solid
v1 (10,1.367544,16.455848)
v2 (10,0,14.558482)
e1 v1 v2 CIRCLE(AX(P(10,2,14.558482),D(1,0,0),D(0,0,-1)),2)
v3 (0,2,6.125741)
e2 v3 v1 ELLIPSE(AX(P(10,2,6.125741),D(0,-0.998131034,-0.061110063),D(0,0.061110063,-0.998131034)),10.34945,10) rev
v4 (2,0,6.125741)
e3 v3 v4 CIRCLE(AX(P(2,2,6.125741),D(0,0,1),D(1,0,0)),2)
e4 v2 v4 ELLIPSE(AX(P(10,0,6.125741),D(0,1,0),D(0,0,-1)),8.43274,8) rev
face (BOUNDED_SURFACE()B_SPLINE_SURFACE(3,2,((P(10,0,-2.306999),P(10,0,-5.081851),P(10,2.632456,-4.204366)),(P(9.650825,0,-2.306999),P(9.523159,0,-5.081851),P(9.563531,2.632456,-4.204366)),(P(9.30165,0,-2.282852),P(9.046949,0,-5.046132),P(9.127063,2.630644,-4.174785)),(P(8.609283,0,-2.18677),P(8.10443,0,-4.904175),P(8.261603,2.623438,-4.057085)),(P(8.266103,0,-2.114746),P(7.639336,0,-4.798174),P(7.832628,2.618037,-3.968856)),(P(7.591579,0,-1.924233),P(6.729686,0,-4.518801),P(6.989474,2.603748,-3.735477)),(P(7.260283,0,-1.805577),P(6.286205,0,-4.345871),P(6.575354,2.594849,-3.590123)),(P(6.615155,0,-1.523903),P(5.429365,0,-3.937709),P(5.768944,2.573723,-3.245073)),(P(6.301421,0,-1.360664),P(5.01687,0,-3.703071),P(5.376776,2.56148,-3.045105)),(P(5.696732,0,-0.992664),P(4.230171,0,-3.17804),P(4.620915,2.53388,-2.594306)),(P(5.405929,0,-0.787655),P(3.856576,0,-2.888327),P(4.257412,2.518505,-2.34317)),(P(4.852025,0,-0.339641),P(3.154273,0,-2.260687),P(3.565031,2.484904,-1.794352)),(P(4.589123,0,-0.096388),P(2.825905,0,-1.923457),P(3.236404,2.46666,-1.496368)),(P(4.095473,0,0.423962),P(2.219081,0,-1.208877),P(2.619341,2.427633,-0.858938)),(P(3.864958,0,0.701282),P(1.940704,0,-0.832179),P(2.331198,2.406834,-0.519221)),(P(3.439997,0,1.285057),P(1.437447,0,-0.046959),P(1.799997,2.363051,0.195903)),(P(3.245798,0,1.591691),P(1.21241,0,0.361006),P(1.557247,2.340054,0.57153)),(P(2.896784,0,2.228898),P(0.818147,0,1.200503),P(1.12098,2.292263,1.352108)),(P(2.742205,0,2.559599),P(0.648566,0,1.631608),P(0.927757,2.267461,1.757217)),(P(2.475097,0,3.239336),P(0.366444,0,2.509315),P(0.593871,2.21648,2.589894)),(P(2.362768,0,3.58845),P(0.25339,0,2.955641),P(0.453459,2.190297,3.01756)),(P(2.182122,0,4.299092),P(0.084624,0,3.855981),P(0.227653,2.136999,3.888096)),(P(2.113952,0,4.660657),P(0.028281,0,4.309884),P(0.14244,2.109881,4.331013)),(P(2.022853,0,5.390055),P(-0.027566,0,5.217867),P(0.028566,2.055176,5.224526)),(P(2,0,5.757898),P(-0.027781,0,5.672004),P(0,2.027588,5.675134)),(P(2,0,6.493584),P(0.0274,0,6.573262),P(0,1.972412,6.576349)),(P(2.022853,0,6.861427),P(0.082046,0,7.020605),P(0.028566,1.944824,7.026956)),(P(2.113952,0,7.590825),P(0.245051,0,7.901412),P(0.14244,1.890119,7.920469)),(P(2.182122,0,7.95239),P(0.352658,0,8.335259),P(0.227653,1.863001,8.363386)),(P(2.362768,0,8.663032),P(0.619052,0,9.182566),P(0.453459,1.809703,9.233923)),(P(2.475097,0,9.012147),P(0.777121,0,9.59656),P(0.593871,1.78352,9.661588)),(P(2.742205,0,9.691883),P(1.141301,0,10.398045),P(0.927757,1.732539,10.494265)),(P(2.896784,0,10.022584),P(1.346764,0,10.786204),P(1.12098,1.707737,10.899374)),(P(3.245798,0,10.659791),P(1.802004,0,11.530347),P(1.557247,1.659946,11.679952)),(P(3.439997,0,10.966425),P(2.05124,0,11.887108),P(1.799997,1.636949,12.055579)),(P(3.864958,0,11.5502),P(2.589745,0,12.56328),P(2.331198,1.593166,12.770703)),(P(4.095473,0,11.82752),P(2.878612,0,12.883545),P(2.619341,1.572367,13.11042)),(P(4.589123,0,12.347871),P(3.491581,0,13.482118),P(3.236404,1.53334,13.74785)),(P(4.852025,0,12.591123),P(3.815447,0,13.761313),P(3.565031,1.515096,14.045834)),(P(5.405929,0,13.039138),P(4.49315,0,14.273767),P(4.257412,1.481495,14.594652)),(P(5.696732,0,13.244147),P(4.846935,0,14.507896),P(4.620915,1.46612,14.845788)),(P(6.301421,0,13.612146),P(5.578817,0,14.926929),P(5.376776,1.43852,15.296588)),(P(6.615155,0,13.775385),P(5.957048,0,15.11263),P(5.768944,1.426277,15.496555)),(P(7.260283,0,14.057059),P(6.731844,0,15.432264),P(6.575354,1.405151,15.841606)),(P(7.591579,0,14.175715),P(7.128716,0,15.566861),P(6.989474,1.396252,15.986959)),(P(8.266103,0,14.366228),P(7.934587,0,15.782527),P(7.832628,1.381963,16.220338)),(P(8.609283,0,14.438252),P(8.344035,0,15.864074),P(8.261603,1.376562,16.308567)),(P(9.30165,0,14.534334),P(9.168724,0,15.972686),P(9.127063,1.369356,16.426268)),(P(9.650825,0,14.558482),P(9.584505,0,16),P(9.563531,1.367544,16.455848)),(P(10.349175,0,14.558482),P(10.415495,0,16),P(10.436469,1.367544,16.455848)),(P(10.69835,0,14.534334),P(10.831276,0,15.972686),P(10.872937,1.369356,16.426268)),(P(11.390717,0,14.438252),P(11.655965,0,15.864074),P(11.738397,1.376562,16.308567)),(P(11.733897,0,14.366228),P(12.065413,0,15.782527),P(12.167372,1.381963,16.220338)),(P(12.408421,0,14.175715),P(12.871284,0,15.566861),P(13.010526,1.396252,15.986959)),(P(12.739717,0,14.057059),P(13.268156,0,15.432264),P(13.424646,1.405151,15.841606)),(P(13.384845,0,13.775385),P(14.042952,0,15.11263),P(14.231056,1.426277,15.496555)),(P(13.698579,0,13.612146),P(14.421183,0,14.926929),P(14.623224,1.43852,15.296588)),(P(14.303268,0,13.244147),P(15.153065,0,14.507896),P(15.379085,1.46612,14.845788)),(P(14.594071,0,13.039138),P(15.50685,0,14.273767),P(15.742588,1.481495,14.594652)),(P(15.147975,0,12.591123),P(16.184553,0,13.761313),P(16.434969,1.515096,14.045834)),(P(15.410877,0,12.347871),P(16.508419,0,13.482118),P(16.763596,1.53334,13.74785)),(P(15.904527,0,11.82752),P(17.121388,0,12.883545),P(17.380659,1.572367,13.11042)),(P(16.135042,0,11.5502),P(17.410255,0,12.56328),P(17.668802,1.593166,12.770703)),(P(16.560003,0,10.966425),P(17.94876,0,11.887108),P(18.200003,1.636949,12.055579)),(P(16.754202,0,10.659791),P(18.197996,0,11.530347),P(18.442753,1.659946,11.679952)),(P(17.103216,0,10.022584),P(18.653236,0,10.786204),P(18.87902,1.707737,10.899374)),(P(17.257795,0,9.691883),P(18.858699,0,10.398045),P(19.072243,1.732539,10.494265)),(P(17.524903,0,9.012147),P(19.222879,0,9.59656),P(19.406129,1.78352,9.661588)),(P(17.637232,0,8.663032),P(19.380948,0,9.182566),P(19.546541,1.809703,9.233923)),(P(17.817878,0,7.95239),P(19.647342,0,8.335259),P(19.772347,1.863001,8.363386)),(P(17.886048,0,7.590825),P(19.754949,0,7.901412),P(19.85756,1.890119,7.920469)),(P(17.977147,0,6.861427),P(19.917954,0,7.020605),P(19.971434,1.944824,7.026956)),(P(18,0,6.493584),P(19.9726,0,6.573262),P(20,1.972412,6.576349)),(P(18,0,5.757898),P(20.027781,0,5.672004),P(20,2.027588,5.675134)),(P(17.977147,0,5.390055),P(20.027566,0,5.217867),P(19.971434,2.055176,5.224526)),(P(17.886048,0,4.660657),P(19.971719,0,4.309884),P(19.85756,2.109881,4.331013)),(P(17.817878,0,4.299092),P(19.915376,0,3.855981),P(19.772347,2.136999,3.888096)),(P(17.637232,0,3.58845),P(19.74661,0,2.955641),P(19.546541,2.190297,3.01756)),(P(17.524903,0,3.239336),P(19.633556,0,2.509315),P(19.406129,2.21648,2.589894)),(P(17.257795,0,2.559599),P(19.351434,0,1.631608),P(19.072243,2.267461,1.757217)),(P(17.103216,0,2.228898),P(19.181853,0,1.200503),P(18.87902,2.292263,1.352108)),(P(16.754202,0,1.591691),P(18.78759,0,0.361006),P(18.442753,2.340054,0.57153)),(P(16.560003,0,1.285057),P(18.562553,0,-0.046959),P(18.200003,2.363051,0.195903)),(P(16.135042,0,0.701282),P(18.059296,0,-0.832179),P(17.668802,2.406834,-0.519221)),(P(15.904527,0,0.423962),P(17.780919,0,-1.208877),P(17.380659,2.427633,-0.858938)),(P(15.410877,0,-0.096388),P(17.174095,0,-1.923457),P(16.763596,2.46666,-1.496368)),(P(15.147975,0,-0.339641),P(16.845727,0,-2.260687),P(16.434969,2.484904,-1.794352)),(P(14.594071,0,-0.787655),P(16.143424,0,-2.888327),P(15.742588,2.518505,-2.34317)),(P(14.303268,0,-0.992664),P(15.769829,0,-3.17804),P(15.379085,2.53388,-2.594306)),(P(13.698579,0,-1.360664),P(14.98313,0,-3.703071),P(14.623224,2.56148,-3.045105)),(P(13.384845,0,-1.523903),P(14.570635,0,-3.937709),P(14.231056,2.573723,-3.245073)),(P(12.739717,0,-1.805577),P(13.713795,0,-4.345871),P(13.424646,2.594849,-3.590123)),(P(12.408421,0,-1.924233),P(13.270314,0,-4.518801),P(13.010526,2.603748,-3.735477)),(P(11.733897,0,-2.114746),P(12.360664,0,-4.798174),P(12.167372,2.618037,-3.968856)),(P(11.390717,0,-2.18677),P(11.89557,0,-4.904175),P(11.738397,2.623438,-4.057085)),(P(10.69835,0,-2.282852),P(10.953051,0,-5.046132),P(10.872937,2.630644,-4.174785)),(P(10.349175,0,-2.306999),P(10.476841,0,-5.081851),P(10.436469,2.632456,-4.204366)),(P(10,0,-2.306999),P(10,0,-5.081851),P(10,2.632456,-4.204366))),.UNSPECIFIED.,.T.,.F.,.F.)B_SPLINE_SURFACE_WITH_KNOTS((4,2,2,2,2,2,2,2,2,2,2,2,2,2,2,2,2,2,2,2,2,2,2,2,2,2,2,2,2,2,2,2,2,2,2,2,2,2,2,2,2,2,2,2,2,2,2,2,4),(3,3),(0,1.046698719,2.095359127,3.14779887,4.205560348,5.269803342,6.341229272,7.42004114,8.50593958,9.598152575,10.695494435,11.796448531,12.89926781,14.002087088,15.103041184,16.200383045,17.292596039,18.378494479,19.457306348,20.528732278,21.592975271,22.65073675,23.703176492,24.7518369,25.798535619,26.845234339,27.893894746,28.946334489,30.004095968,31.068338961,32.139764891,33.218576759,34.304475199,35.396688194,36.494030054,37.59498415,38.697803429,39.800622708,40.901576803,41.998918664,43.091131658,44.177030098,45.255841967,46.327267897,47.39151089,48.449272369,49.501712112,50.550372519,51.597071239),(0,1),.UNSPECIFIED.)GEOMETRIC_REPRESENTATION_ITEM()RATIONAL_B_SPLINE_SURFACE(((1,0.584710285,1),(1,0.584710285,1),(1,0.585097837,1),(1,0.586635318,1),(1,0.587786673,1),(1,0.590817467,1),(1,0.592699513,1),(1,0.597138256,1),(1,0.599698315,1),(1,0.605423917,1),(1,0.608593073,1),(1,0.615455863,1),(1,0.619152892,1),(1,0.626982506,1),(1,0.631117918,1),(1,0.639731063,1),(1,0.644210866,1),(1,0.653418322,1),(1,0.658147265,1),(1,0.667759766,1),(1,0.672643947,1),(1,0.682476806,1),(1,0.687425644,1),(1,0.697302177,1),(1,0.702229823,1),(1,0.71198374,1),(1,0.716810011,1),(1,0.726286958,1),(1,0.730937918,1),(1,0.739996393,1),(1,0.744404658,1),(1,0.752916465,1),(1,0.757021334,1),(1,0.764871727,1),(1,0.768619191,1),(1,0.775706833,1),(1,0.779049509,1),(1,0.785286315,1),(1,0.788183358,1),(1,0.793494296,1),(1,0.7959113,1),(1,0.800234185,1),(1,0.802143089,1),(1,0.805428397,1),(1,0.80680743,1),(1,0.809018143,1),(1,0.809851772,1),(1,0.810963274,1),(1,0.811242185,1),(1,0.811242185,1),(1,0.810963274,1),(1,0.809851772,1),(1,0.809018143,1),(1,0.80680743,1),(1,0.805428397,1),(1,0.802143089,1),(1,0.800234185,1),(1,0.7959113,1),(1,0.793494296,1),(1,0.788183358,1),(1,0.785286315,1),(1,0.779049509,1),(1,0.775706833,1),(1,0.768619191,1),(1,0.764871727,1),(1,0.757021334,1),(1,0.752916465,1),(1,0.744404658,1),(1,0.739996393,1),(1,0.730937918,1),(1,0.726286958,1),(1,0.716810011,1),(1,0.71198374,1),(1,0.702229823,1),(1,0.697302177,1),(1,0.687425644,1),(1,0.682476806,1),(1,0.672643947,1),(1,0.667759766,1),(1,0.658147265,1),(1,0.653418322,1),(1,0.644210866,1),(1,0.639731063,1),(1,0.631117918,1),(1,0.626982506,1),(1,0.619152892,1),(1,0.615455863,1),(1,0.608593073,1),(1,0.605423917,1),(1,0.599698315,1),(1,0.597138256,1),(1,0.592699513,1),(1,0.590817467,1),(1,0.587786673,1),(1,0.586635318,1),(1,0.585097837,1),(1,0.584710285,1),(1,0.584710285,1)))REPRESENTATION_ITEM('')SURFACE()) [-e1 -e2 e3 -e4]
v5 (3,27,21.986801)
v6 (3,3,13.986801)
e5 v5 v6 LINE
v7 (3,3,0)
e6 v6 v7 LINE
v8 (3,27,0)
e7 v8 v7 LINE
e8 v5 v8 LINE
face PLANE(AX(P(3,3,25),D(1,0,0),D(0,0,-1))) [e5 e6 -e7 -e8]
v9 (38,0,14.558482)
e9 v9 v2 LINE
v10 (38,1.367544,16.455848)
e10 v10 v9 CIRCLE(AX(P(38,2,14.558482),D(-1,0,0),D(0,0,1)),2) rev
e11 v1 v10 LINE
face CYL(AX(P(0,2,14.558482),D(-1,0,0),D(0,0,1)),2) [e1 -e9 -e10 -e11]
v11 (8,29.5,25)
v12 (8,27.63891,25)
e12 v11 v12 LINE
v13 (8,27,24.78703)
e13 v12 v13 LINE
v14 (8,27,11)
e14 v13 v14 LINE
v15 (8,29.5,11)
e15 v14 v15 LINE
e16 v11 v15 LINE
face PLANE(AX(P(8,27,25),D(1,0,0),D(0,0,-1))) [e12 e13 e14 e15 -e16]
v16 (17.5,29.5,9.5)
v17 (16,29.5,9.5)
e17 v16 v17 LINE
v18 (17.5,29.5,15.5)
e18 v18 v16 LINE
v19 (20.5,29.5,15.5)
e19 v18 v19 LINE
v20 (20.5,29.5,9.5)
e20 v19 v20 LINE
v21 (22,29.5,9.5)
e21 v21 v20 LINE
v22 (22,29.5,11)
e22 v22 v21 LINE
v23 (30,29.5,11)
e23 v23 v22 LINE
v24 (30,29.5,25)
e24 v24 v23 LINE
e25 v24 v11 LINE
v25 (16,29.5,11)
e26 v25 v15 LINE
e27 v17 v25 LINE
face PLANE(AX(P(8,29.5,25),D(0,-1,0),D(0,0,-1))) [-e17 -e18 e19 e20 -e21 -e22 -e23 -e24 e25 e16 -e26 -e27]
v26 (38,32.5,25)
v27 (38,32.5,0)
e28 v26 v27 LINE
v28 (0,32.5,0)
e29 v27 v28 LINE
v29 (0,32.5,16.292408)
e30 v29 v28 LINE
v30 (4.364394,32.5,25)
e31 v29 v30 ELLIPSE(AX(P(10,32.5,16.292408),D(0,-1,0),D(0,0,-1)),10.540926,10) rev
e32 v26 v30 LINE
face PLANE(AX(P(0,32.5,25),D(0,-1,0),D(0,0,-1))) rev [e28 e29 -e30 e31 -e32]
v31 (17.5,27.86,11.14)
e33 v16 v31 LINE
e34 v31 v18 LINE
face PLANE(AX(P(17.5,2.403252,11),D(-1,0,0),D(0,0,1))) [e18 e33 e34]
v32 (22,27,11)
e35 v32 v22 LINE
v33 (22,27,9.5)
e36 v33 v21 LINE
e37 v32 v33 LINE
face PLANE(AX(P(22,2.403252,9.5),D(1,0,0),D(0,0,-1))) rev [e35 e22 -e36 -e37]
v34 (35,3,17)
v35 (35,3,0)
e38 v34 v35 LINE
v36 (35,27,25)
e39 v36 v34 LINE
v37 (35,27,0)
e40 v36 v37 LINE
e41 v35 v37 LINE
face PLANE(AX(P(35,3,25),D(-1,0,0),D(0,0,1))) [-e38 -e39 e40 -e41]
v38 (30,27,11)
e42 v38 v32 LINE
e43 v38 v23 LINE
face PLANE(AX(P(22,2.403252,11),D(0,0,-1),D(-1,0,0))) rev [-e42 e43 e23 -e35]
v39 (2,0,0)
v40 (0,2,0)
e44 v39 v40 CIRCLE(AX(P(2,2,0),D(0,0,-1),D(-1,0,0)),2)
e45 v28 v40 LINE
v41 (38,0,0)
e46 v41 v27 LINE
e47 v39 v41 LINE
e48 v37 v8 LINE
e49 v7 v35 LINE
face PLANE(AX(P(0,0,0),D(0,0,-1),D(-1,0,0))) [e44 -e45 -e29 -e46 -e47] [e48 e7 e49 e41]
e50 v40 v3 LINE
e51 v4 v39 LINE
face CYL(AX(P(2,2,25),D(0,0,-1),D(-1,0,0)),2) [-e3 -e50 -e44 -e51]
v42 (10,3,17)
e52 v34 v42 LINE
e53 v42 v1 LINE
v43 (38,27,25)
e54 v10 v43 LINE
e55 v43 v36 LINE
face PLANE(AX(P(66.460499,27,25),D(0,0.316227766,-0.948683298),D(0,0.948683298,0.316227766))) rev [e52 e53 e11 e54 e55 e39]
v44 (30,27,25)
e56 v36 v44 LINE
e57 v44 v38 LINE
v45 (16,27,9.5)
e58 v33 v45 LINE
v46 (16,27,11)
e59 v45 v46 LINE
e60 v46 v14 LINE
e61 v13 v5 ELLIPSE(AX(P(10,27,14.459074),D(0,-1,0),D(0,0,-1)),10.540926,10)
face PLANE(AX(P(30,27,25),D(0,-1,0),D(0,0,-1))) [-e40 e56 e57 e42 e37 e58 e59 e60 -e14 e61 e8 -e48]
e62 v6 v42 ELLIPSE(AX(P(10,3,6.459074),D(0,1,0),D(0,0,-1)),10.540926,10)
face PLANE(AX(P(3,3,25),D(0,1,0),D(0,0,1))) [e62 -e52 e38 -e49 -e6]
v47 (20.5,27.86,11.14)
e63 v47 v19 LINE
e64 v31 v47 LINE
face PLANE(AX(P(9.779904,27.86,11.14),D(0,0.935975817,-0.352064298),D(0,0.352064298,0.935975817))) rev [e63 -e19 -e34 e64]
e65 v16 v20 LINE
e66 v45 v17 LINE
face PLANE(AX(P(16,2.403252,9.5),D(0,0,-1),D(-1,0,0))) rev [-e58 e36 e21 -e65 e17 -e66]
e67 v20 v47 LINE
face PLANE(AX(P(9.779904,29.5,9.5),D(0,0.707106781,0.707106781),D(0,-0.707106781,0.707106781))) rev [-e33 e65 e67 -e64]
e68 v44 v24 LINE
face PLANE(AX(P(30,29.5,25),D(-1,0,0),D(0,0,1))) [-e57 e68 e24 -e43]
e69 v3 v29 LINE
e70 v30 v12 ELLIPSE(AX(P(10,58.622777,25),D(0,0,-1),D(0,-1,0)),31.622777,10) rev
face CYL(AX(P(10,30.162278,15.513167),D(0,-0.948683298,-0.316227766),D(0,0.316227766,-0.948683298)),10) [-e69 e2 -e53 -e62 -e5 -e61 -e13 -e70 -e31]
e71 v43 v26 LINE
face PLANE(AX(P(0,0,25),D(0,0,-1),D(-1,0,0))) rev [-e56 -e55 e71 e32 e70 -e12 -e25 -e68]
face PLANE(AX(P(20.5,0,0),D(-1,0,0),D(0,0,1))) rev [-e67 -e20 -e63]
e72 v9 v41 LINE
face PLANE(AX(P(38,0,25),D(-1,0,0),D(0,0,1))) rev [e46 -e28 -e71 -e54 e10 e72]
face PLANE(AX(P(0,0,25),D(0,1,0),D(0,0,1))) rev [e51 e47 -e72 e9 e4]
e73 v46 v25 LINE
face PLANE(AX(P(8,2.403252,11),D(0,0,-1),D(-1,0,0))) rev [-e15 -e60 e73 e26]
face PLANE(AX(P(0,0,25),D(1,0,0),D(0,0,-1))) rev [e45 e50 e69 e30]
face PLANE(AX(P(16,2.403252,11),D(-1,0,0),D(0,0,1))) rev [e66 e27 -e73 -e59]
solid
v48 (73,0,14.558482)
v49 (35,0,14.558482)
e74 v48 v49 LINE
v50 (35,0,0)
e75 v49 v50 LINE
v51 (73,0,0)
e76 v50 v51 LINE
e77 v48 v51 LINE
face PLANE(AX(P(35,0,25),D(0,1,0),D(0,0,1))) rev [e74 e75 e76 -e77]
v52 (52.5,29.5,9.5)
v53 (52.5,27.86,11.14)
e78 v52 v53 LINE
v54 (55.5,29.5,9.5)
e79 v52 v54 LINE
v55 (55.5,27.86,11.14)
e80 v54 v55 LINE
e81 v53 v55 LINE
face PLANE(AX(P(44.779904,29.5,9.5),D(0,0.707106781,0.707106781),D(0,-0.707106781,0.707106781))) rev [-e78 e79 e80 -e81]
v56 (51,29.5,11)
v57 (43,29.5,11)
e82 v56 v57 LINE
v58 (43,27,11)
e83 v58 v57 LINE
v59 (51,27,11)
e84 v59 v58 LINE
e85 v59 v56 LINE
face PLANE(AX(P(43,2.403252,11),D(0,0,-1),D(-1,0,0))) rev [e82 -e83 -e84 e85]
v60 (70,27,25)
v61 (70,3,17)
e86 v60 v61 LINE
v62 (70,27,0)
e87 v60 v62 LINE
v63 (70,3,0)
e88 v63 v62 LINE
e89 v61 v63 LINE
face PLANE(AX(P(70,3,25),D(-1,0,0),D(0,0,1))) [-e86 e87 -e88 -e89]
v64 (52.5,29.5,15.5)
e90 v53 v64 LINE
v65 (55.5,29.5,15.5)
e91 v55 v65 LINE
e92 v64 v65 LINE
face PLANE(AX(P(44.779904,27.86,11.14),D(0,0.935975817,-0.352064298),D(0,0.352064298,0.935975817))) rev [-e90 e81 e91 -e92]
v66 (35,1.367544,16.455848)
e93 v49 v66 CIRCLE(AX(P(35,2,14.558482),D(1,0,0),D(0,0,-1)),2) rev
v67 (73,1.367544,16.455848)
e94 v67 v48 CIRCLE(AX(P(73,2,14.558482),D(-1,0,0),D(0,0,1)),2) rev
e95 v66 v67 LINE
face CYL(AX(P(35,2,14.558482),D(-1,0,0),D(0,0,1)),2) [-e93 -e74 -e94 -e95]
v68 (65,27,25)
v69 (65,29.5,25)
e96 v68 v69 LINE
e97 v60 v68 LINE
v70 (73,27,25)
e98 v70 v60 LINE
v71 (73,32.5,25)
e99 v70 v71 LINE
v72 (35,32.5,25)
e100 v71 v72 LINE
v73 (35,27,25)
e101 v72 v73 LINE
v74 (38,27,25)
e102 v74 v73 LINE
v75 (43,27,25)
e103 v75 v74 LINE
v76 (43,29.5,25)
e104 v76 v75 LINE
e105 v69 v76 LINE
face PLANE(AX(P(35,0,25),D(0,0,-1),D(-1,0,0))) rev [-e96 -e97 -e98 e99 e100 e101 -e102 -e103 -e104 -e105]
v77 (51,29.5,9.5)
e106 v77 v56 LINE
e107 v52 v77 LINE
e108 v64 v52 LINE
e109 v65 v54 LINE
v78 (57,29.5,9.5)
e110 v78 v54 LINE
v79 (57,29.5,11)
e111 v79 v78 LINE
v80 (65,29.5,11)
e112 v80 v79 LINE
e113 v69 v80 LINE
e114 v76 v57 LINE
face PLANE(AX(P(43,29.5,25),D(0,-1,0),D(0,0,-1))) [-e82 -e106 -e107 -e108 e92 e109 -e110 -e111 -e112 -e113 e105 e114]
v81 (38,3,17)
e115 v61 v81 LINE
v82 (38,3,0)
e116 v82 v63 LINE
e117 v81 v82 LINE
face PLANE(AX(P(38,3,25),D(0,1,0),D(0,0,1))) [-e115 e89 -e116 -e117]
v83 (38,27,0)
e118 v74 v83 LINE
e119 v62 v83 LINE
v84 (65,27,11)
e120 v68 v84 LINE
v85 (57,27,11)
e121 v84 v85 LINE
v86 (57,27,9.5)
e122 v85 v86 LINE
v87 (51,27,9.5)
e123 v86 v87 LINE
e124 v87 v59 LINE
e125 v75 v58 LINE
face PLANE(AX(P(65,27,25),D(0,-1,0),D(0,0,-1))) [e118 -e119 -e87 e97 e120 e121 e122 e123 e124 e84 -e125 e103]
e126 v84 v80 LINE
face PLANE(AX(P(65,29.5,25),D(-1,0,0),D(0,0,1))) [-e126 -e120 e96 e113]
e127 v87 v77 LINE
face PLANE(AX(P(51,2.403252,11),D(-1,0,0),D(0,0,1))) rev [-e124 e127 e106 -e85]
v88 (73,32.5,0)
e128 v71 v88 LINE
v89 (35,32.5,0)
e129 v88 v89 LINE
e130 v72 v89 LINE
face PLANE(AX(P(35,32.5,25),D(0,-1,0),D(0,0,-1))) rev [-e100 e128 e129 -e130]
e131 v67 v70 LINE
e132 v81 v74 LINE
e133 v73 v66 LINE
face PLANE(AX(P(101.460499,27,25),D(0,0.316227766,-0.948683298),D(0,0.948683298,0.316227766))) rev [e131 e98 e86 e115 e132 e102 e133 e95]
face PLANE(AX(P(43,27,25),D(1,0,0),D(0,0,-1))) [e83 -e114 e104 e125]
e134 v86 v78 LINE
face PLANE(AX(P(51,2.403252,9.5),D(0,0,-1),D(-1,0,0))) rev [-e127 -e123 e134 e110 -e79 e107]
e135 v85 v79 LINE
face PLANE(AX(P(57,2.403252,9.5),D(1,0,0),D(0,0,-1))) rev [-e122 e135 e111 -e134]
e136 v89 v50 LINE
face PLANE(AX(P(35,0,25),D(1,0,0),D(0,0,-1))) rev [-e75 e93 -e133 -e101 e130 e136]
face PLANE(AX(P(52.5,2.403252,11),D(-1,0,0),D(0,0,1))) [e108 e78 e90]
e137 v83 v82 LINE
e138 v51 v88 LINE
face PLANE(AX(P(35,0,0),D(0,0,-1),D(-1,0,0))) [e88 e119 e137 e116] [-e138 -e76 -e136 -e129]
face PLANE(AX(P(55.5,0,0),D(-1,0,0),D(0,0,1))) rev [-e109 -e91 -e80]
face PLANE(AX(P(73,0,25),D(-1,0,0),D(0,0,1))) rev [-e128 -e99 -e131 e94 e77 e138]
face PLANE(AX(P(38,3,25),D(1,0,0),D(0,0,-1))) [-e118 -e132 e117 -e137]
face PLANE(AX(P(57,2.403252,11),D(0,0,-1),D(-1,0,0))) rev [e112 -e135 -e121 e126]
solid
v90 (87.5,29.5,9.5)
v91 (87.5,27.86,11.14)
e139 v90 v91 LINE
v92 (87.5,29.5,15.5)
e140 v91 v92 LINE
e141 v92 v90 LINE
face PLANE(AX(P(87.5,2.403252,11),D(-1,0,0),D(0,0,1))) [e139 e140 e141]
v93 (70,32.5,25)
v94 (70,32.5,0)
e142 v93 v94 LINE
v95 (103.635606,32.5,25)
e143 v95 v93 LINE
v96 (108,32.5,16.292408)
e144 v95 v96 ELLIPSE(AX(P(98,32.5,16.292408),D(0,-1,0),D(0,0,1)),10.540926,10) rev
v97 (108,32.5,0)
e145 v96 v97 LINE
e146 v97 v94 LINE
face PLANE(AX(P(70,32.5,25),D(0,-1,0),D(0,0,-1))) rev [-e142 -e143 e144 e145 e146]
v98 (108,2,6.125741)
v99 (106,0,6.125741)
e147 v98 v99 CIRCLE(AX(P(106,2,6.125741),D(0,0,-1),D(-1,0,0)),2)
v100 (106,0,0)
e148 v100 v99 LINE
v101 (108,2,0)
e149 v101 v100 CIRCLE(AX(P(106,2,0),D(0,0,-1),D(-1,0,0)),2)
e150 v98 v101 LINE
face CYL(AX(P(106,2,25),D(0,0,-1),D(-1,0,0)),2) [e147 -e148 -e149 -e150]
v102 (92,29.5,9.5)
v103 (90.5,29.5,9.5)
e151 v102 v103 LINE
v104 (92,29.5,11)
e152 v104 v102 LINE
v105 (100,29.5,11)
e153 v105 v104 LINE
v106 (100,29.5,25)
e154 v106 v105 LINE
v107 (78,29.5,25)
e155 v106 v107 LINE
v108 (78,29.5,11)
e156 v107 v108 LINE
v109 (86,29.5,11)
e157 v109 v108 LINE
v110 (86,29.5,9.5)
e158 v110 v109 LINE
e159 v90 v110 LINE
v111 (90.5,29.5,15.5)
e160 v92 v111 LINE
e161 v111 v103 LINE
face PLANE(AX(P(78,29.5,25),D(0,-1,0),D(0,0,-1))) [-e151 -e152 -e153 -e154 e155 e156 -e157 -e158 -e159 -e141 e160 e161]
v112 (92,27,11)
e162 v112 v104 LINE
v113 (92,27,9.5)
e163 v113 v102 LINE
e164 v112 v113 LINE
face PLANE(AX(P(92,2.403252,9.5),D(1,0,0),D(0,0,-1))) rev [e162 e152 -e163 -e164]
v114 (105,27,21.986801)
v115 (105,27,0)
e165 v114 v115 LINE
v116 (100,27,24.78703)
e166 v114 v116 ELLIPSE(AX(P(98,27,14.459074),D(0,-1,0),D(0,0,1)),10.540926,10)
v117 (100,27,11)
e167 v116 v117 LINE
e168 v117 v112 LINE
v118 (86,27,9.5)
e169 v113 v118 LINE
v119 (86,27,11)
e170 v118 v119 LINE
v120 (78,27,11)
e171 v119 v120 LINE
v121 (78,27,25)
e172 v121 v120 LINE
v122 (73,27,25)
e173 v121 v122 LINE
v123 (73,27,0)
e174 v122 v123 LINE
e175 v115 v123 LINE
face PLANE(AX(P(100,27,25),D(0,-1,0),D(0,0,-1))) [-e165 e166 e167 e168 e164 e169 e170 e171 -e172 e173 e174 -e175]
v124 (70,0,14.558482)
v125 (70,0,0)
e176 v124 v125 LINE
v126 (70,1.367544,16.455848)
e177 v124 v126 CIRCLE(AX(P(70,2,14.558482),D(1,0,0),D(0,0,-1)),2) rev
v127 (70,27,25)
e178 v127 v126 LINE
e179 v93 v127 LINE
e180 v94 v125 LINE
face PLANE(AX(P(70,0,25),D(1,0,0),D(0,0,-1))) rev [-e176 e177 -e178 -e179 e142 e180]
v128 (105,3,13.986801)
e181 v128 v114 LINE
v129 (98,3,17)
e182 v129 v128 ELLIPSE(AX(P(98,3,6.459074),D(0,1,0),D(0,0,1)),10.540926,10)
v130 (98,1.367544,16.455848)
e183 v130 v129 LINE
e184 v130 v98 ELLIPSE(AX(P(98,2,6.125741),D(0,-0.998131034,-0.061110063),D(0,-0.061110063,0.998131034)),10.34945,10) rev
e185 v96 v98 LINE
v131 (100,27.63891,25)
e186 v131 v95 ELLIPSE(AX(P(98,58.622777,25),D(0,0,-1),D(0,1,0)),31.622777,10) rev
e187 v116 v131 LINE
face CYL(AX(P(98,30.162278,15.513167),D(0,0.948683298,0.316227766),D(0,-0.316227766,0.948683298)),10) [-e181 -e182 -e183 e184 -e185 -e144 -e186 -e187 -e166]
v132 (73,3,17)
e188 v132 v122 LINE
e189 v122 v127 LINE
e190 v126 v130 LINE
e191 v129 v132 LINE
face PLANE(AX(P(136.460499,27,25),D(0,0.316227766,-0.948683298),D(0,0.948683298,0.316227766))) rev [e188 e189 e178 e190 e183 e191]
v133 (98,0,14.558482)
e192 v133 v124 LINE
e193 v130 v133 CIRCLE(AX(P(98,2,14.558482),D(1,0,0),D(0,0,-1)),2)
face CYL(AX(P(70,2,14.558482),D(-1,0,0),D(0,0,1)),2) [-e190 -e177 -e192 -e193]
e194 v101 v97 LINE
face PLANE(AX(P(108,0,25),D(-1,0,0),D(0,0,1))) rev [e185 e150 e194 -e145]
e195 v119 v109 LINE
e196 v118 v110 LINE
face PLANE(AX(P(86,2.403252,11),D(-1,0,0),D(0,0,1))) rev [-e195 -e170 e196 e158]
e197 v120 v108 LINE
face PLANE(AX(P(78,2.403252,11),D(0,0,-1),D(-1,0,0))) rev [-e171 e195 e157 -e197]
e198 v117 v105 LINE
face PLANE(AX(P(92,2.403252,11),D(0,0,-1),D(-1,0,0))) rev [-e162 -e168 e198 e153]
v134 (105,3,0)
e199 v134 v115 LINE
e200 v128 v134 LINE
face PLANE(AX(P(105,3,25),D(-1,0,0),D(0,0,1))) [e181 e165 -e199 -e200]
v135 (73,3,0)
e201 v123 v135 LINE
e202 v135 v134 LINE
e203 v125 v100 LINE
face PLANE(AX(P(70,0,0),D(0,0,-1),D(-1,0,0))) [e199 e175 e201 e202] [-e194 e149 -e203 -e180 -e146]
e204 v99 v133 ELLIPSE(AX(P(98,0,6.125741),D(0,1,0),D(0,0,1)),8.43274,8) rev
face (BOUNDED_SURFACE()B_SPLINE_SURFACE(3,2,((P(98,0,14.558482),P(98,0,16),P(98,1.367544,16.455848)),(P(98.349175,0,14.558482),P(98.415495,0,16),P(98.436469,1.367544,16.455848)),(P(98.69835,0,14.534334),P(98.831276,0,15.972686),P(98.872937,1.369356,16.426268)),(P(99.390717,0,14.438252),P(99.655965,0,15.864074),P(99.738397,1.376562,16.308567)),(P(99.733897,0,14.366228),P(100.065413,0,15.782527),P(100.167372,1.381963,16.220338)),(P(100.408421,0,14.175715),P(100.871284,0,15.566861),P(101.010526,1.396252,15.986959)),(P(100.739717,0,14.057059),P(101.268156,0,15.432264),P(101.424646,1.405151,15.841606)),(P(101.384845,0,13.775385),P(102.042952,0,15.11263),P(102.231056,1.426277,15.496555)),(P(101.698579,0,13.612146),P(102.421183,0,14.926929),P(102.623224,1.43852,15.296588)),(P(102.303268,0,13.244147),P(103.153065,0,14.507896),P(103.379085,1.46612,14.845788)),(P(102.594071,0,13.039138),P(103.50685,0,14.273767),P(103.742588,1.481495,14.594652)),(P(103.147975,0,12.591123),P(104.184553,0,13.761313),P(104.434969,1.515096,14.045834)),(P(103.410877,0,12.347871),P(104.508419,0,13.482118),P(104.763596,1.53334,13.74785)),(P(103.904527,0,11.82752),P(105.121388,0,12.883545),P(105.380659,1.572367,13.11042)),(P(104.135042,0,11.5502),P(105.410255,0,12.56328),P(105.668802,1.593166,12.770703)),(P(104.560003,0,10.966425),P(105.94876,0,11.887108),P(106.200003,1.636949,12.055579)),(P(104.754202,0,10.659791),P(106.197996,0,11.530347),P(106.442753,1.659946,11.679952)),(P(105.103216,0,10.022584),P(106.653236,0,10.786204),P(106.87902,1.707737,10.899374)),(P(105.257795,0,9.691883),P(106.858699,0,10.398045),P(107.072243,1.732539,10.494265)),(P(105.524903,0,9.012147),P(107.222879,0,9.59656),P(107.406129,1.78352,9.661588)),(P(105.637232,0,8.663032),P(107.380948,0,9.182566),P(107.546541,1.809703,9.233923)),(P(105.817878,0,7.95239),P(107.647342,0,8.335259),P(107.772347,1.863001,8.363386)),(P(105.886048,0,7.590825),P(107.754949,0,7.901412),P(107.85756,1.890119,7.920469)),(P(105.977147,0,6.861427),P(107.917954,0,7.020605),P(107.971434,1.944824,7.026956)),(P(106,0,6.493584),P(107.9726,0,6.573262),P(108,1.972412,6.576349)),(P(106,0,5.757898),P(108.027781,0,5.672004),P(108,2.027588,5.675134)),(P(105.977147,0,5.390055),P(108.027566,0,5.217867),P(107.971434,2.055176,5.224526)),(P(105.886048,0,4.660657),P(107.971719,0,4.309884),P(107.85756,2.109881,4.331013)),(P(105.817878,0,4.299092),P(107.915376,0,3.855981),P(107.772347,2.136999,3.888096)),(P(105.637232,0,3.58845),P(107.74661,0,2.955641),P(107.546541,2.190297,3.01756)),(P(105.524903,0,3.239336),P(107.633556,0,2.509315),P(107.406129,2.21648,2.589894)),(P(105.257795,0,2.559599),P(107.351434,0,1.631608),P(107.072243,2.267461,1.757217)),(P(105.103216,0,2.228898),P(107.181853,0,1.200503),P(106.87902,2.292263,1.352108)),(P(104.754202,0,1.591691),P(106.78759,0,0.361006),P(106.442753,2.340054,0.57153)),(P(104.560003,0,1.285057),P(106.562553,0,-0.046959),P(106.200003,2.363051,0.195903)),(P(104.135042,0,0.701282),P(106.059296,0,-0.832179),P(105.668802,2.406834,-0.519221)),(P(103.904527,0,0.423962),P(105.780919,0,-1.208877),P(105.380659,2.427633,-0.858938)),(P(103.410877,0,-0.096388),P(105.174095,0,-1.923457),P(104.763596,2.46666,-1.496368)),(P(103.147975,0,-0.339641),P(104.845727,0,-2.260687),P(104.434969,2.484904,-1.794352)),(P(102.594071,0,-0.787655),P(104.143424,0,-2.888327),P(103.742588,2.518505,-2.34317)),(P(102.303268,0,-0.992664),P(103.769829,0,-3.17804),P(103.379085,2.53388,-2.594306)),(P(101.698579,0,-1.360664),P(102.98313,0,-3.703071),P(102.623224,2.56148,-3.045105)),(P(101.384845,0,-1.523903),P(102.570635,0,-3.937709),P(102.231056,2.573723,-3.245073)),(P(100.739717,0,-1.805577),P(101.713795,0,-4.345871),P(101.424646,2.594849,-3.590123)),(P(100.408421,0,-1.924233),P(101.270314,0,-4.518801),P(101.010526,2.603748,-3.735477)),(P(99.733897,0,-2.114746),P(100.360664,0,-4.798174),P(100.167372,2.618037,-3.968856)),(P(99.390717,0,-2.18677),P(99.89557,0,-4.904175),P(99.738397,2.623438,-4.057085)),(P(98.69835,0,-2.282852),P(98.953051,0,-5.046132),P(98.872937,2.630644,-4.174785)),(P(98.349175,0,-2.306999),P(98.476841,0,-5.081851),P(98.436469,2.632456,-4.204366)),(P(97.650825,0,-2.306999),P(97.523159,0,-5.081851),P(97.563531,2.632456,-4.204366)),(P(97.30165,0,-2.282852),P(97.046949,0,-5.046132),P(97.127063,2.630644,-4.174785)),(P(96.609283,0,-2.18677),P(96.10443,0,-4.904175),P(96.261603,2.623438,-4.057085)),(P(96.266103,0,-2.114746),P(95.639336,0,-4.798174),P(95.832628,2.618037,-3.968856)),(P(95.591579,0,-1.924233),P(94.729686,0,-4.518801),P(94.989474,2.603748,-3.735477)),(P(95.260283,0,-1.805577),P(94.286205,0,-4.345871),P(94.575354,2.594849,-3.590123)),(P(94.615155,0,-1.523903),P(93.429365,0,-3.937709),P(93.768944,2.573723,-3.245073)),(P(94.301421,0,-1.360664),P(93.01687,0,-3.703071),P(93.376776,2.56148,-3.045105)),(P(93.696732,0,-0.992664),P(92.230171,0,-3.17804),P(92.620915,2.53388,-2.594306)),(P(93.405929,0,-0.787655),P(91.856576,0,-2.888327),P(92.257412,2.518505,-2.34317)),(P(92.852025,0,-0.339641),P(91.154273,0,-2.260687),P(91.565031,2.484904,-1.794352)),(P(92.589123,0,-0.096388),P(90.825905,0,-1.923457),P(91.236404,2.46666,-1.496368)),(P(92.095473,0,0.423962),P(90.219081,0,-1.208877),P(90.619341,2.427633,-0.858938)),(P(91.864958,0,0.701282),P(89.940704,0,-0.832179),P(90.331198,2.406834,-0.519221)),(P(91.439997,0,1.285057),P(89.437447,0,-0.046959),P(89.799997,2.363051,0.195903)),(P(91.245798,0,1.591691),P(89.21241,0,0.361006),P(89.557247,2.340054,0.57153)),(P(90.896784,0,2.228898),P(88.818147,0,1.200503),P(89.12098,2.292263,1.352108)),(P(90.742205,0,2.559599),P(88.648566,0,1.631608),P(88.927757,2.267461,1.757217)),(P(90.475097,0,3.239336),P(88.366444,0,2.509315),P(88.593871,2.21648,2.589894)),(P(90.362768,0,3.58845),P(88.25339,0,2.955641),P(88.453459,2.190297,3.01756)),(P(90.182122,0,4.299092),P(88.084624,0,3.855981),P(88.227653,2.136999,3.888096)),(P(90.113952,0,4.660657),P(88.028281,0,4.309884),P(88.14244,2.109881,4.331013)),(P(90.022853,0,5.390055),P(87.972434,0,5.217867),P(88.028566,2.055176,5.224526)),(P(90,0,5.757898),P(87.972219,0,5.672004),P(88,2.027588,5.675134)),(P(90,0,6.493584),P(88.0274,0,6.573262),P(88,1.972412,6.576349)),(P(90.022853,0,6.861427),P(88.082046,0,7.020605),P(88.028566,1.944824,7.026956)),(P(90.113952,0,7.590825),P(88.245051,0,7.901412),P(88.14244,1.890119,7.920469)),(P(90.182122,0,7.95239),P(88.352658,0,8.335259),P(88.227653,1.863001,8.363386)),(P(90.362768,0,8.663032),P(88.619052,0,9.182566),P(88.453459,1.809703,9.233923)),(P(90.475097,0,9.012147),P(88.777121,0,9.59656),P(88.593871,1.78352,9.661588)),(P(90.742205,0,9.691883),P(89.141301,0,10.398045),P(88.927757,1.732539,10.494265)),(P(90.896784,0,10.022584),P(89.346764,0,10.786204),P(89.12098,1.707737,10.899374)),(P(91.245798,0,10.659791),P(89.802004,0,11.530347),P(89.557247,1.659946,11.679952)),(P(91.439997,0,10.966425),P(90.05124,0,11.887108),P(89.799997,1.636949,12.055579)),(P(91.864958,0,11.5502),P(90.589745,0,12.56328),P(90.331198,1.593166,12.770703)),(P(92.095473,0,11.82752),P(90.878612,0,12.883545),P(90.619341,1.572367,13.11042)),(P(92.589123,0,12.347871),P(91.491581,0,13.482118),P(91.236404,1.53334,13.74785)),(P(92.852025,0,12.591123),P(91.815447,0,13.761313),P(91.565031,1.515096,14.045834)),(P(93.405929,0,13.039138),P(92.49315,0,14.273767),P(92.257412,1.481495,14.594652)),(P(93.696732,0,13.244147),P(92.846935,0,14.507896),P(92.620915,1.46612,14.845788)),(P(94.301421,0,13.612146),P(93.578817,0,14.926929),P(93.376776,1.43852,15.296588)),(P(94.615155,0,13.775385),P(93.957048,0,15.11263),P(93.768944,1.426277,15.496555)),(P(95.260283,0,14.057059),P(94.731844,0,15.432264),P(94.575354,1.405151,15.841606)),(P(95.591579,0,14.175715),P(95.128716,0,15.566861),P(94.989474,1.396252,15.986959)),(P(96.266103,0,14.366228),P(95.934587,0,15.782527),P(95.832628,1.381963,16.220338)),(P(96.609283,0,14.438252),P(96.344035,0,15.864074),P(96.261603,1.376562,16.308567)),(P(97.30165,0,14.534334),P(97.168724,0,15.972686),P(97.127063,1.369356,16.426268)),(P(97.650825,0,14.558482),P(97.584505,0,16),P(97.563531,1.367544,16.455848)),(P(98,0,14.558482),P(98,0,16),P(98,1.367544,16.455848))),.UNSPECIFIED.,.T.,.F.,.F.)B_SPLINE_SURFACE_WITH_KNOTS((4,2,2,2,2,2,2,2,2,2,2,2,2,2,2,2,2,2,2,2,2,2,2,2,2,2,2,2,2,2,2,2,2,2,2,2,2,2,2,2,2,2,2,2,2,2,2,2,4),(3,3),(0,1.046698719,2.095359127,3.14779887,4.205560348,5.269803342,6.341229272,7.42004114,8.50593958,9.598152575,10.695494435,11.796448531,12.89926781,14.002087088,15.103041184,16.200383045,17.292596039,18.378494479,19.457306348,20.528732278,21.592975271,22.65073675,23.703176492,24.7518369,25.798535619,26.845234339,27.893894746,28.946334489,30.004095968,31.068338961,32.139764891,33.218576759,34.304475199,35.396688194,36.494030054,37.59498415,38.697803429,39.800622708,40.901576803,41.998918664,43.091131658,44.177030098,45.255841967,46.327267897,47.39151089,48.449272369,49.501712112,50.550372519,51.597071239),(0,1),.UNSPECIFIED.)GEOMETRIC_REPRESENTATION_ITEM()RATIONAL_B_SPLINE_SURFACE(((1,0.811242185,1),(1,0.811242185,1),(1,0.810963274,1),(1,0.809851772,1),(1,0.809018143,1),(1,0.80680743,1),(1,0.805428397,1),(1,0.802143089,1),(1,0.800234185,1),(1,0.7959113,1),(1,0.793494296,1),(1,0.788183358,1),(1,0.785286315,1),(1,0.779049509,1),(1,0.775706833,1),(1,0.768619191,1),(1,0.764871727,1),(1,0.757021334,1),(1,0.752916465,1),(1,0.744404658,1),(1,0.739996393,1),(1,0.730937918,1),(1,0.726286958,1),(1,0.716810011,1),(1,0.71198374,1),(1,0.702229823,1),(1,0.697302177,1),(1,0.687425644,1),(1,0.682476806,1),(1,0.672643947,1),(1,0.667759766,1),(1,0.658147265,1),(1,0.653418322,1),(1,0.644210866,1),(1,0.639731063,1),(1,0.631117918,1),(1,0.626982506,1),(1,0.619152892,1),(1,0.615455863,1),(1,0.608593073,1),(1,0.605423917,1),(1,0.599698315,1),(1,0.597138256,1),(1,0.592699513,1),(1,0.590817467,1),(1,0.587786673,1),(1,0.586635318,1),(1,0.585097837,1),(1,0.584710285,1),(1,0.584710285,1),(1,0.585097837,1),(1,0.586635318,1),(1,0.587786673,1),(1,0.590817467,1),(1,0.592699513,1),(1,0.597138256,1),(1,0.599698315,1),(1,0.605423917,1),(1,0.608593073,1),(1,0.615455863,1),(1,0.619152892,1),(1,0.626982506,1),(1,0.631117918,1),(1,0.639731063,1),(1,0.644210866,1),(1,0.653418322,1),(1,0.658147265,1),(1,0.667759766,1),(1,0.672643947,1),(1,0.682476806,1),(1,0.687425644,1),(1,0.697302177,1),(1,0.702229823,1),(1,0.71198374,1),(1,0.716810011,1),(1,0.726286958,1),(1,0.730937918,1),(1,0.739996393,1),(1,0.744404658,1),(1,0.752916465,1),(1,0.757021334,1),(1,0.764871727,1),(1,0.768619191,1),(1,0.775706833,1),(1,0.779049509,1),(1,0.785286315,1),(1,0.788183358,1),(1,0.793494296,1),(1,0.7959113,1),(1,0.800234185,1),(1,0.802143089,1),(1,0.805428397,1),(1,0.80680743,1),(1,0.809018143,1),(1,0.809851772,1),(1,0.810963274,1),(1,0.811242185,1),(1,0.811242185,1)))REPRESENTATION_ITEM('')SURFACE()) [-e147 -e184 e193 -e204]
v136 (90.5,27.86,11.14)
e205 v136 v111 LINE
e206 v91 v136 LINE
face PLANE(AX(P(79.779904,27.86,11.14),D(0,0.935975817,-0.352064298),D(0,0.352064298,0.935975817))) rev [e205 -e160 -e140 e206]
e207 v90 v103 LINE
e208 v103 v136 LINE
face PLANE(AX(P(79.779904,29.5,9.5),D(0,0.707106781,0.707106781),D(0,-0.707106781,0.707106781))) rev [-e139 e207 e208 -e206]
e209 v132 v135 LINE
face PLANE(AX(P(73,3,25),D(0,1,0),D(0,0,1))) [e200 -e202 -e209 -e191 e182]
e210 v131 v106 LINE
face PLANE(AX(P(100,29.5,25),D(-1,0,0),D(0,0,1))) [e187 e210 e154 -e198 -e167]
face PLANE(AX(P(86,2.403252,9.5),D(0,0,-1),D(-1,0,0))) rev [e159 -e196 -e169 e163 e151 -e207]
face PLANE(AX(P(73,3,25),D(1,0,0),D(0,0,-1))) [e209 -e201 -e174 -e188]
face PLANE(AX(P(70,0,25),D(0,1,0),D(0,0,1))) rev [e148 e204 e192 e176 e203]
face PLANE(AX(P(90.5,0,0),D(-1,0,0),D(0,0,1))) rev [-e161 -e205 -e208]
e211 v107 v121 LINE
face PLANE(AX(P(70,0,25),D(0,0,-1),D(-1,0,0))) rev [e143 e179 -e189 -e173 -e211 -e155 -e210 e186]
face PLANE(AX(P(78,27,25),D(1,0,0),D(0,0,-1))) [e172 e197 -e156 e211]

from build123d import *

# Parameters (mm, degrees)
SKETCH1_W           = 38
SKETCH1_H           = 32.5
BOSS_EXTRUDE1_DEPTH = 25
BOSS_EXTRUDE2_DEPTH = 2.5
CUT_EXTRUDE1_REACH  = 57.904
BOSS_EXTRUDE3_START = 1.5
BOSS_EXTRUDE3_DEPTH = 3
LPATTERN1_COUNT     = 3
LPATTERN1_PITCH     = 35
FILLET1_R           = 10
FILLET2_R           = 10
FILLET3_R           = 2
FILLET4_R           = 2
FILLET5_R           = 2


with BuildPart() as part:
    # Sketch1 → Boss-Extrude1 (new body)
    with BuildSketch(Plane.XY):
        with Locations((19, 16.25)):
            Rectangle(SKETCH1_W, SKETCH1_H)
        Polygon((8, 27), (8, 29.5), (30, 29.5), (30, 27), (35, 27), (35, 3), (3, 3), (3, 27), align=None, mode=Mode.SUBTRACT)
    extrude(amount=BOSS_EXTRUDE1_DEPTH)

    # Sketch3 → Boss-Extrude2 (add)
    with BuildSketch(Plane.XZ.offset(-29.5)):
        Polygon((8, 0), (30, 0), (30, 11), (22, 11), (22, 9.5), (16, 9.5), (16, 11), (8, 11), align=None)
    extrude(amount=BOSS_EXTRUDE2_DEPTH)

    # Cut-Extrude1: up to this face of the body (flat: up to its plane)
    cut_extrude1_end = Plane(part.part.faces().sort_by_distance((38, 16.25, 12.5))[0])
    # Sketch4 → Cut-Extrude1 (cut, up to the picked face)
    with BuildSketch(Plane.ZY, mode=Mode.PRIVATE) as cut_extrude1_sk1:
        Polygon((25, 27), (16, 0), (25, 0), align=None)
    cut_extrude1_tool1 = split(extrude(cut_extrude1_sk1.sketch, amount=-CUT_EXTRUDE1_REACH, mode=Mode.PRIVATE), bisect_by=cut_extrude1_end, keep=Keep.BOTH, mode=Mode.PRIVATE)
    add(cut_extrude1_tool1.solids().sort_by(Axis((0, 9, 22), (1, 0, 0)))[0], mode=Mode.SUBTRACT)

    # Sketch6 → Boss-Extrude3 (add)
    with BuildSketch(Plane.ZY.offset(-22).offset(BOSS_EXTRUDE3_START)):
        Polygon((9.5, 29.5), (11.14, 27.86), (15.5, 29.5), align=None)
    extrude(amount=BOSS_EXTRUDE3_DEPTH)


with BuildPart() as lpattern1_1:
    # LPattern1: pattern copy
    add(part.part.moved(Location(Vector(1, 0, 0) * (1 * LPATTERN1_PITCH))))

    # Fillet4
    fillet4_edges = [lpattern1_1.edges().sort_by_distance(p)[0] for p in [
        (54, 0, 16),
    ]]
    fillet(fillet4_edges, radius=FILLET4_R)


with BuildPart() as lpattern1_2:
    # LPattern1: pattern copy
    add(part.part.moved(Location(Vector(1, 0, 0) * (2 * LPATTERN1_PITCH))))

    # Fillet1
    # the kernel refuses this fillet: 10 mm, written as the material it takes off along each edge
    with BuildSketch(Plane(origin=(108, 50.717082451, 32.90569415), x_dir=(0, 0.316227766016838, -0.9486832980505138), z_dir=(0, -0.9486832980505139, -0.316227766016838))) as fillet1_piece_1:
        with BuildLine():
            CenterArc((FILLET1_R, -FILLET1_R), FILLET1_R, 90, 90)
            Line((0, -FILLET1_R), (0, 0))
            Line((0, 0), (FILLET1_R, 0))
        make_face()
    extrude(amount=78.460498942, mode=Mode.SUBTRACT)

    # Fillet5
    fillet5_edges = [lpattern1_2.edges().sort_by_distance(p)[0] for p in [
        (84, 0, 16),
        (108, 0, 2.729537233),
        (105.163482835, 0, 12.813930283),
    ]]
    fillet(fillet5_edges, radius=FILLET5_R)


with BuildPart() as part_1:
    add(part.part)

    # Fillet2
    # the kernel refuses this fillet: 10 mm, written as the material it takes off along each edge
    with BuildSketch(Plane(origin=(0, 50.717082451, 32.90569415), x_dir=(1, 0, 0), z_dir=(0, -0.9486832980505139, -0.316227766016838))) as fillet2_piece_1:
        with BuildLine():
            CenterArc((FILLET2_R, -FILLET2_R), FILLET2_R, 90, 90)
            Line((0, -FILLET2_R), (0, 0))
            Line((0, 0), (FILLET2_R, 0))
        make_face()
    extrude(amount=78.460498942, mode=Mode.SUBTRACT)

    # Fillet3
    fillet3_edges = [part_1.edges().sort_by_distance(p)[0] for p in [
        (0, 0, 2.729537233),
        (2.836517165, 0, 12.813930283),
        (24, 0, 16),
    ]]
    fillet(fillet3_edges, radius=FILLET3_R)


solid = Compound([lpattern1_1.part, lpattern1_2.part, part_1.part])
